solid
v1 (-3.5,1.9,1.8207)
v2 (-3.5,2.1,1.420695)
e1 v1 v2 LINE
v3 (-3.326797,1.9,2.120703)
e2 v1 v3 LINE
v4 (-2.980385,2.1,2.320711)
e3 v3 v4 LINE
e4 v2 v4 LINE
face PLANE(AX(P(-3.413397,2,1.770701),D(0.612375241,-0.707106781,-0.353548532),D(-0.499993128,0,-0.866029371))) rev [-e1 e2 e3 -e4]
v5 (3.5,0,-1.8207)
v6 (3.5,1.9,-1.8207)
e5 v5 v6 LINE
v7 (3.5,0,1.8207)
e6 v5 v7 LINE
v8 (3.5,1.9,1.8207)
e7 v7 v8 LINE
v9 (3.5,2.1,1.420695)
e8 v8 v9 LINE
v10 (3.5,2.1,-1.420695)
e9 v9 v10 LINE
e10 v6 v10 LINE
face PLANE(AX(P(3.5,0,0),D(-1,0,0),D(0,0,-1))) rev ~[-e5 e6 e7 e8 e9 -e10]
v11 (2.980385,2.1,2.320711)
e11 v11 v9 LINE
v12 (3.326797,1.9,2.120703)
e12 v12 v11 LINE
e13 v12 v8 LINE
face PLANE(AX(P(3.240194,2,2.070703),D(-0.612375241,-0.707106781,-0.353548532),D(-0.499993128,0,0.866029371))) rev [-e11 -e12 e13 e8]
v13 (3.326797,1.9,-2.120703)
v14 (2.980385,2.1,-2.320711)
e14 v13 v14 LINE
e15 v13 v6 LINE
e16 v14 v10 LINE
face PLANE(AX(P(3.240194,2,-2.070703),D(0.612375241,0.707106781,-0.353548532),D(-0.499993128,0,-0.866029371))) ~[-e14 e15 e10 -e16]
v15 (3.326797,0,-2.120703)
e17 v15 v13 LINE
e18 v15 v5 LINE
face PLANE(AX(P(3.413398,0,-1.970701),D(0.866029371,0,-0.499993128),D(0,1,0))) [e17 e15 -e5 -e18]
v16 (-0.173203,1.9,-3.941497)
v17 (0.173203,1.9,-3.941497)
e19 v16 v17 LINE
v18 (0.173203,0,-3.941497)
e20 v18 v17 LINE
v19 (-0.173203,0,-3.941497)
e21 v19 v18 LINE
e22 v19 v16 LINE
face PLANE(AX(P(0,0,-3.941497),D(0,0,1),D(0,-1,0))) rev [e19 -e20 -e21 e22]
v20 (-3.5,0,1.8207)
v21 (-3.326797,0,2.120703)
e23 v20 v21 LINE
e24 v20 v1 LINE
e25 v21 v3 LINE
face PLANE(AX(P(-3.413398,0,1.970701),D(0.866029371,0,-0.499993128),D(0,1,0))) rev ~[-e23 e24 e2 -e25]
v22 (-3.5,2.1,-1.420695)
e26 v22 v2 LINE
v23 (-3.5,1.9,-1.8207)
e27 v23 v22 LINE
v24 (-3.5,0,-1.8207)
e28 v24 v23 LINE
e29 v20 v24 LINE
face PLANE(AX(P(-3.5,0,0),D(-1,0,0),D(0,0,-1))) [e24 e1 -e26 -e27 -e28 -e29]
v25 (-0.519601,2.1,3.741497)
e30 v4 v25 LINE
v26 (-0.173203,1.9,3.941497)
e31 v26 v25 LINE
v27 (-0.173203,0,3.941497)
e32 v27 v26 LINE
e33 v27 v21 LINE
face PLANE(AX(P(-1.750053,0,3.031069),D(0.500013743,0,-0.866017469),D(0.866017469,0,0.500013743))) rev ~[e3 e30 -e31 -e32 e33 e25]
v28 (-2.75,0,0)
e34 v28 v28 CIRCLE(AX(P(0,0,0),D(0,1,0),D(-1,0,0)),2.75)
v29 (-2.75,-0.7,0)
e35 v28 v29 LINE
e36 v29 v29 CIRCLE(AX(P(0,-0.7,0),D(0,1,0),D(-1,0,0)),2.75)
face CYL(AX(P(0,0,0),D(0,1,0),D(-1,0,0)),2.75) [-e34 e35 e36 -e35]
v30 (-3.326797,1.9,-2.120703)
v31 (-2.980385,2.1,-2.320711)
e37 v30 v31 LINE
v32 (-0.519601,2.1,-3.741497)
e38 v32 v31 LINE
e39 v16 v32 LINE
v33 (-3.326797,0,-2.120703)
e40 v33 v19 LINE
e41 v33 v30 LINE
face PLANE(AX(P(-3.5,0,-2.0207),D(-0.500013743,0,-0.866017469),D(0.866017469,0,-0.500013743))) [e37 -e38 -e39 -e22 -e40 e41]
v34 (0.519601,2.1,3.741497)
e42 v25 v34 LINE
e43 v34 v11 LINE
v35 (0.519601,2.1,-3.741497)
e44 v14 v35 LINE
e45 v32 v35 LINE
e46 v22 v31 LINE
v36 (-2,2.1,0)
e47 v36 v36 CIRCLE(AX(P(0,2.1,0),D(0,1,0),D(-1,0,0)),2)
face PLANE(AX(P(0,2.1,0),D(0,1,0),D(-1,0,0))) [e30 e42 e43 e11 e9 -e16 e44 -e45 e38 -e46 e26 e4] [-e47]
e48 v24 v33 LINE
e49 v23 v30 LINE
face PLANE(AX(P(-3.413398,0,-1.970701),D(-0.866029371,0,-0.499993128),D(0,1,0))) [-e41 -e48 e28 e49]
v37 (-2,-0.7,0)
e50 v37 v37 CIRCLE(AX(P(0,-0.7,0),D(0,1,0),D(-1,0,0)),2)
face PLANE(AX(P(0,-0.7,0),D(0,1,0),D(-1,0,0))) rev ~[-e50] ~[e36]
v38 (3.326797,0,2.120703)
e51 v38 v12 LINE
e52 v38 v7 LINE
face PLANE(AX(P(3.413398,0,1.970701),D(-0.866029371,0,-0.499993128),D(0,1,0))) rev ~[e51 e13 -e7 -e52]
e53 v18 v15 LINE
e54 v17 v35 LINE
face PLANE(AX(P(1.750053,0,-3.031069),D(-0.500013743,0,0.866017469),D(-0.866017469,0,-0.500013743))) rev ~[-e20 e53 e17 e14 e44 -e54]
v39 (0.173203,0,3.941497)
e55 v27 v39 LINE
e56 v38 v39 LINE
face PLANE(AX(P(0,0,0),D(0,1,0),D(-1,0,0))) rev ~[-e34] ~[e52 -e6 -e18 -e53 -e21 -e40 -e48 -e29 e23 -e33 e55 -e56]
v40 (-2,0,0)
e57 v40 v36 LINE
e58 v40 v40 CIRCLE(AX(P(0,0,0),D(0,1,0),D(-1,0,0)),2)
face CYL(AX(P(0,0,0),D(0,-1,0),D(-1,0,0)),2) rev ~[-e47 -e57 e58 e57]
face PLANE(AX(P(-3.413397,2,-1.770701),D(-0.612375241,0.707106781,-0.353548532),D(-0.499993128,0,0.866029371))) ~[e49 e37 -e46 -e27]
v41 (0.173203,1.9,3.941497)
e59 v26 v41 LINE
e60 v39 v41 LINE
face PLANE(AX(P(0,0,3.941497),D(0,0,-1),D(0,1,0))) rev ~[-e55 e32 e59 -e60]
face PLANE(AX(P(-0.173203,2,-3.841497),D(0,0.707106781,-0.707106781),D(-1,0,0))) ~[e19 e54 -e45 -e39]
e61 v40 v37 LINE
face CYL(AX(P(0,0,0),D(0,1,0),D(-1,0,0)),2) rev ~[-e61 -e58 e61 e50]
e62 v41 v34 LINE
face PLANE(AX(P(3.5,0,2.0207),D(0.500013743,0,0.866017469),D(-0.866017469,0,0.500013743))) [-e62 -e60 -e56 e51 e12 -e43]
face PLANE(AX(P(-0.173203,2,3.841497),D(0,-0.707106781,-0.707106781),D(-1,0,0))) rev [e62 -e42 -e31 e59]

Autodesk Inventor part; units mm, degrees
ref_plane "YZ Plane" through (0, 0, 0) normal (1, 0, 0) x (0, 1, 0)
ref_plane "XZ Plane" through (0, 0, 0) normal (0, 1, 0) x (-1, 0, 0)
ref_plane "XY Plane" through (0, 0, 0) normal (0, 0, 1) x (1, 0, 0)
sketch "スケッチ2" plane through (0, 0, 0) normal (0, 1, 0) x (-1, 0, 0)
  circle A0 centre (0, 0) radius 2
  circle A1 centre (0, 0) radius 2.75
  circle A2 centre (0, 0) radius 3.5
  line L0 (3.2709, 0) -> (-4.3069, 0) construction
  line L1 (-3.5, -2.0207) -> (0, -4.0415)
  line L2 (-3.5, 0) -> (-3.5, -2.0207)
  line L3 (0, 3.4516) -> (0, -4.8702) construction
  line L4 (-3.5, 2.0207) -> (0, 4.0415)
  line L5 (-3.5, 0) -> (-3.5, 2.0207)
  line L6 (3.5, -2.0207) -> (0, -4.0415)
  line L7 (3.5, 0) -> (3.5, -2.0207)
  line L8 (3.5, 2.0207) -> (0, 4.0415)
  line L9 (3.5, 0) -> (3.5, 2.0207)
  dimension "d8" = 7
  dimension "d6" = 4
  dimension "d7" = 5.5
  dimension "d25" = 120
extrude "押し出し1" add sketch "スケッチ2" against normal blind 0.7 contours A1
extrude "押し出し2" add sketch "スケッチ2" along normal blind 2.1 contours A1 | A2 | L7 L6 A2 | A2 L8 L9 | A2 L4 L8 | L6 L1 A2 | A2 L5 L4 | L1 L2 A2
chamfer "面取り1" distance 0.2 angle 45 6 edges at (3.5, 1.05, -2.0207) (0, 1.05, -4.0415) (-3.5, 1.05, -2.0207) (-3.5, 1.05, 2.0207) (0, 1.05, 4.0415) (3.5, 1.05, 2.0207)
chamfer "面取り2" distance 0.2 angle 45 6 edges at (3.4134, 2.1, -1.9707) (0, 2.1, -3.9415) (-3.4134, 2.1, -1.9707) (-3.4134, 2.1, 1.9707) (0, 2.1, 3.9415) (3.4134, 2.1, 1.9707)
thread "ねじ1" size "M4x0.7" class "6H" standard "ANSI Metric M Profile" full length
properties part number "S4-07-3W" material "ステンレス鋼 AISI 304"
